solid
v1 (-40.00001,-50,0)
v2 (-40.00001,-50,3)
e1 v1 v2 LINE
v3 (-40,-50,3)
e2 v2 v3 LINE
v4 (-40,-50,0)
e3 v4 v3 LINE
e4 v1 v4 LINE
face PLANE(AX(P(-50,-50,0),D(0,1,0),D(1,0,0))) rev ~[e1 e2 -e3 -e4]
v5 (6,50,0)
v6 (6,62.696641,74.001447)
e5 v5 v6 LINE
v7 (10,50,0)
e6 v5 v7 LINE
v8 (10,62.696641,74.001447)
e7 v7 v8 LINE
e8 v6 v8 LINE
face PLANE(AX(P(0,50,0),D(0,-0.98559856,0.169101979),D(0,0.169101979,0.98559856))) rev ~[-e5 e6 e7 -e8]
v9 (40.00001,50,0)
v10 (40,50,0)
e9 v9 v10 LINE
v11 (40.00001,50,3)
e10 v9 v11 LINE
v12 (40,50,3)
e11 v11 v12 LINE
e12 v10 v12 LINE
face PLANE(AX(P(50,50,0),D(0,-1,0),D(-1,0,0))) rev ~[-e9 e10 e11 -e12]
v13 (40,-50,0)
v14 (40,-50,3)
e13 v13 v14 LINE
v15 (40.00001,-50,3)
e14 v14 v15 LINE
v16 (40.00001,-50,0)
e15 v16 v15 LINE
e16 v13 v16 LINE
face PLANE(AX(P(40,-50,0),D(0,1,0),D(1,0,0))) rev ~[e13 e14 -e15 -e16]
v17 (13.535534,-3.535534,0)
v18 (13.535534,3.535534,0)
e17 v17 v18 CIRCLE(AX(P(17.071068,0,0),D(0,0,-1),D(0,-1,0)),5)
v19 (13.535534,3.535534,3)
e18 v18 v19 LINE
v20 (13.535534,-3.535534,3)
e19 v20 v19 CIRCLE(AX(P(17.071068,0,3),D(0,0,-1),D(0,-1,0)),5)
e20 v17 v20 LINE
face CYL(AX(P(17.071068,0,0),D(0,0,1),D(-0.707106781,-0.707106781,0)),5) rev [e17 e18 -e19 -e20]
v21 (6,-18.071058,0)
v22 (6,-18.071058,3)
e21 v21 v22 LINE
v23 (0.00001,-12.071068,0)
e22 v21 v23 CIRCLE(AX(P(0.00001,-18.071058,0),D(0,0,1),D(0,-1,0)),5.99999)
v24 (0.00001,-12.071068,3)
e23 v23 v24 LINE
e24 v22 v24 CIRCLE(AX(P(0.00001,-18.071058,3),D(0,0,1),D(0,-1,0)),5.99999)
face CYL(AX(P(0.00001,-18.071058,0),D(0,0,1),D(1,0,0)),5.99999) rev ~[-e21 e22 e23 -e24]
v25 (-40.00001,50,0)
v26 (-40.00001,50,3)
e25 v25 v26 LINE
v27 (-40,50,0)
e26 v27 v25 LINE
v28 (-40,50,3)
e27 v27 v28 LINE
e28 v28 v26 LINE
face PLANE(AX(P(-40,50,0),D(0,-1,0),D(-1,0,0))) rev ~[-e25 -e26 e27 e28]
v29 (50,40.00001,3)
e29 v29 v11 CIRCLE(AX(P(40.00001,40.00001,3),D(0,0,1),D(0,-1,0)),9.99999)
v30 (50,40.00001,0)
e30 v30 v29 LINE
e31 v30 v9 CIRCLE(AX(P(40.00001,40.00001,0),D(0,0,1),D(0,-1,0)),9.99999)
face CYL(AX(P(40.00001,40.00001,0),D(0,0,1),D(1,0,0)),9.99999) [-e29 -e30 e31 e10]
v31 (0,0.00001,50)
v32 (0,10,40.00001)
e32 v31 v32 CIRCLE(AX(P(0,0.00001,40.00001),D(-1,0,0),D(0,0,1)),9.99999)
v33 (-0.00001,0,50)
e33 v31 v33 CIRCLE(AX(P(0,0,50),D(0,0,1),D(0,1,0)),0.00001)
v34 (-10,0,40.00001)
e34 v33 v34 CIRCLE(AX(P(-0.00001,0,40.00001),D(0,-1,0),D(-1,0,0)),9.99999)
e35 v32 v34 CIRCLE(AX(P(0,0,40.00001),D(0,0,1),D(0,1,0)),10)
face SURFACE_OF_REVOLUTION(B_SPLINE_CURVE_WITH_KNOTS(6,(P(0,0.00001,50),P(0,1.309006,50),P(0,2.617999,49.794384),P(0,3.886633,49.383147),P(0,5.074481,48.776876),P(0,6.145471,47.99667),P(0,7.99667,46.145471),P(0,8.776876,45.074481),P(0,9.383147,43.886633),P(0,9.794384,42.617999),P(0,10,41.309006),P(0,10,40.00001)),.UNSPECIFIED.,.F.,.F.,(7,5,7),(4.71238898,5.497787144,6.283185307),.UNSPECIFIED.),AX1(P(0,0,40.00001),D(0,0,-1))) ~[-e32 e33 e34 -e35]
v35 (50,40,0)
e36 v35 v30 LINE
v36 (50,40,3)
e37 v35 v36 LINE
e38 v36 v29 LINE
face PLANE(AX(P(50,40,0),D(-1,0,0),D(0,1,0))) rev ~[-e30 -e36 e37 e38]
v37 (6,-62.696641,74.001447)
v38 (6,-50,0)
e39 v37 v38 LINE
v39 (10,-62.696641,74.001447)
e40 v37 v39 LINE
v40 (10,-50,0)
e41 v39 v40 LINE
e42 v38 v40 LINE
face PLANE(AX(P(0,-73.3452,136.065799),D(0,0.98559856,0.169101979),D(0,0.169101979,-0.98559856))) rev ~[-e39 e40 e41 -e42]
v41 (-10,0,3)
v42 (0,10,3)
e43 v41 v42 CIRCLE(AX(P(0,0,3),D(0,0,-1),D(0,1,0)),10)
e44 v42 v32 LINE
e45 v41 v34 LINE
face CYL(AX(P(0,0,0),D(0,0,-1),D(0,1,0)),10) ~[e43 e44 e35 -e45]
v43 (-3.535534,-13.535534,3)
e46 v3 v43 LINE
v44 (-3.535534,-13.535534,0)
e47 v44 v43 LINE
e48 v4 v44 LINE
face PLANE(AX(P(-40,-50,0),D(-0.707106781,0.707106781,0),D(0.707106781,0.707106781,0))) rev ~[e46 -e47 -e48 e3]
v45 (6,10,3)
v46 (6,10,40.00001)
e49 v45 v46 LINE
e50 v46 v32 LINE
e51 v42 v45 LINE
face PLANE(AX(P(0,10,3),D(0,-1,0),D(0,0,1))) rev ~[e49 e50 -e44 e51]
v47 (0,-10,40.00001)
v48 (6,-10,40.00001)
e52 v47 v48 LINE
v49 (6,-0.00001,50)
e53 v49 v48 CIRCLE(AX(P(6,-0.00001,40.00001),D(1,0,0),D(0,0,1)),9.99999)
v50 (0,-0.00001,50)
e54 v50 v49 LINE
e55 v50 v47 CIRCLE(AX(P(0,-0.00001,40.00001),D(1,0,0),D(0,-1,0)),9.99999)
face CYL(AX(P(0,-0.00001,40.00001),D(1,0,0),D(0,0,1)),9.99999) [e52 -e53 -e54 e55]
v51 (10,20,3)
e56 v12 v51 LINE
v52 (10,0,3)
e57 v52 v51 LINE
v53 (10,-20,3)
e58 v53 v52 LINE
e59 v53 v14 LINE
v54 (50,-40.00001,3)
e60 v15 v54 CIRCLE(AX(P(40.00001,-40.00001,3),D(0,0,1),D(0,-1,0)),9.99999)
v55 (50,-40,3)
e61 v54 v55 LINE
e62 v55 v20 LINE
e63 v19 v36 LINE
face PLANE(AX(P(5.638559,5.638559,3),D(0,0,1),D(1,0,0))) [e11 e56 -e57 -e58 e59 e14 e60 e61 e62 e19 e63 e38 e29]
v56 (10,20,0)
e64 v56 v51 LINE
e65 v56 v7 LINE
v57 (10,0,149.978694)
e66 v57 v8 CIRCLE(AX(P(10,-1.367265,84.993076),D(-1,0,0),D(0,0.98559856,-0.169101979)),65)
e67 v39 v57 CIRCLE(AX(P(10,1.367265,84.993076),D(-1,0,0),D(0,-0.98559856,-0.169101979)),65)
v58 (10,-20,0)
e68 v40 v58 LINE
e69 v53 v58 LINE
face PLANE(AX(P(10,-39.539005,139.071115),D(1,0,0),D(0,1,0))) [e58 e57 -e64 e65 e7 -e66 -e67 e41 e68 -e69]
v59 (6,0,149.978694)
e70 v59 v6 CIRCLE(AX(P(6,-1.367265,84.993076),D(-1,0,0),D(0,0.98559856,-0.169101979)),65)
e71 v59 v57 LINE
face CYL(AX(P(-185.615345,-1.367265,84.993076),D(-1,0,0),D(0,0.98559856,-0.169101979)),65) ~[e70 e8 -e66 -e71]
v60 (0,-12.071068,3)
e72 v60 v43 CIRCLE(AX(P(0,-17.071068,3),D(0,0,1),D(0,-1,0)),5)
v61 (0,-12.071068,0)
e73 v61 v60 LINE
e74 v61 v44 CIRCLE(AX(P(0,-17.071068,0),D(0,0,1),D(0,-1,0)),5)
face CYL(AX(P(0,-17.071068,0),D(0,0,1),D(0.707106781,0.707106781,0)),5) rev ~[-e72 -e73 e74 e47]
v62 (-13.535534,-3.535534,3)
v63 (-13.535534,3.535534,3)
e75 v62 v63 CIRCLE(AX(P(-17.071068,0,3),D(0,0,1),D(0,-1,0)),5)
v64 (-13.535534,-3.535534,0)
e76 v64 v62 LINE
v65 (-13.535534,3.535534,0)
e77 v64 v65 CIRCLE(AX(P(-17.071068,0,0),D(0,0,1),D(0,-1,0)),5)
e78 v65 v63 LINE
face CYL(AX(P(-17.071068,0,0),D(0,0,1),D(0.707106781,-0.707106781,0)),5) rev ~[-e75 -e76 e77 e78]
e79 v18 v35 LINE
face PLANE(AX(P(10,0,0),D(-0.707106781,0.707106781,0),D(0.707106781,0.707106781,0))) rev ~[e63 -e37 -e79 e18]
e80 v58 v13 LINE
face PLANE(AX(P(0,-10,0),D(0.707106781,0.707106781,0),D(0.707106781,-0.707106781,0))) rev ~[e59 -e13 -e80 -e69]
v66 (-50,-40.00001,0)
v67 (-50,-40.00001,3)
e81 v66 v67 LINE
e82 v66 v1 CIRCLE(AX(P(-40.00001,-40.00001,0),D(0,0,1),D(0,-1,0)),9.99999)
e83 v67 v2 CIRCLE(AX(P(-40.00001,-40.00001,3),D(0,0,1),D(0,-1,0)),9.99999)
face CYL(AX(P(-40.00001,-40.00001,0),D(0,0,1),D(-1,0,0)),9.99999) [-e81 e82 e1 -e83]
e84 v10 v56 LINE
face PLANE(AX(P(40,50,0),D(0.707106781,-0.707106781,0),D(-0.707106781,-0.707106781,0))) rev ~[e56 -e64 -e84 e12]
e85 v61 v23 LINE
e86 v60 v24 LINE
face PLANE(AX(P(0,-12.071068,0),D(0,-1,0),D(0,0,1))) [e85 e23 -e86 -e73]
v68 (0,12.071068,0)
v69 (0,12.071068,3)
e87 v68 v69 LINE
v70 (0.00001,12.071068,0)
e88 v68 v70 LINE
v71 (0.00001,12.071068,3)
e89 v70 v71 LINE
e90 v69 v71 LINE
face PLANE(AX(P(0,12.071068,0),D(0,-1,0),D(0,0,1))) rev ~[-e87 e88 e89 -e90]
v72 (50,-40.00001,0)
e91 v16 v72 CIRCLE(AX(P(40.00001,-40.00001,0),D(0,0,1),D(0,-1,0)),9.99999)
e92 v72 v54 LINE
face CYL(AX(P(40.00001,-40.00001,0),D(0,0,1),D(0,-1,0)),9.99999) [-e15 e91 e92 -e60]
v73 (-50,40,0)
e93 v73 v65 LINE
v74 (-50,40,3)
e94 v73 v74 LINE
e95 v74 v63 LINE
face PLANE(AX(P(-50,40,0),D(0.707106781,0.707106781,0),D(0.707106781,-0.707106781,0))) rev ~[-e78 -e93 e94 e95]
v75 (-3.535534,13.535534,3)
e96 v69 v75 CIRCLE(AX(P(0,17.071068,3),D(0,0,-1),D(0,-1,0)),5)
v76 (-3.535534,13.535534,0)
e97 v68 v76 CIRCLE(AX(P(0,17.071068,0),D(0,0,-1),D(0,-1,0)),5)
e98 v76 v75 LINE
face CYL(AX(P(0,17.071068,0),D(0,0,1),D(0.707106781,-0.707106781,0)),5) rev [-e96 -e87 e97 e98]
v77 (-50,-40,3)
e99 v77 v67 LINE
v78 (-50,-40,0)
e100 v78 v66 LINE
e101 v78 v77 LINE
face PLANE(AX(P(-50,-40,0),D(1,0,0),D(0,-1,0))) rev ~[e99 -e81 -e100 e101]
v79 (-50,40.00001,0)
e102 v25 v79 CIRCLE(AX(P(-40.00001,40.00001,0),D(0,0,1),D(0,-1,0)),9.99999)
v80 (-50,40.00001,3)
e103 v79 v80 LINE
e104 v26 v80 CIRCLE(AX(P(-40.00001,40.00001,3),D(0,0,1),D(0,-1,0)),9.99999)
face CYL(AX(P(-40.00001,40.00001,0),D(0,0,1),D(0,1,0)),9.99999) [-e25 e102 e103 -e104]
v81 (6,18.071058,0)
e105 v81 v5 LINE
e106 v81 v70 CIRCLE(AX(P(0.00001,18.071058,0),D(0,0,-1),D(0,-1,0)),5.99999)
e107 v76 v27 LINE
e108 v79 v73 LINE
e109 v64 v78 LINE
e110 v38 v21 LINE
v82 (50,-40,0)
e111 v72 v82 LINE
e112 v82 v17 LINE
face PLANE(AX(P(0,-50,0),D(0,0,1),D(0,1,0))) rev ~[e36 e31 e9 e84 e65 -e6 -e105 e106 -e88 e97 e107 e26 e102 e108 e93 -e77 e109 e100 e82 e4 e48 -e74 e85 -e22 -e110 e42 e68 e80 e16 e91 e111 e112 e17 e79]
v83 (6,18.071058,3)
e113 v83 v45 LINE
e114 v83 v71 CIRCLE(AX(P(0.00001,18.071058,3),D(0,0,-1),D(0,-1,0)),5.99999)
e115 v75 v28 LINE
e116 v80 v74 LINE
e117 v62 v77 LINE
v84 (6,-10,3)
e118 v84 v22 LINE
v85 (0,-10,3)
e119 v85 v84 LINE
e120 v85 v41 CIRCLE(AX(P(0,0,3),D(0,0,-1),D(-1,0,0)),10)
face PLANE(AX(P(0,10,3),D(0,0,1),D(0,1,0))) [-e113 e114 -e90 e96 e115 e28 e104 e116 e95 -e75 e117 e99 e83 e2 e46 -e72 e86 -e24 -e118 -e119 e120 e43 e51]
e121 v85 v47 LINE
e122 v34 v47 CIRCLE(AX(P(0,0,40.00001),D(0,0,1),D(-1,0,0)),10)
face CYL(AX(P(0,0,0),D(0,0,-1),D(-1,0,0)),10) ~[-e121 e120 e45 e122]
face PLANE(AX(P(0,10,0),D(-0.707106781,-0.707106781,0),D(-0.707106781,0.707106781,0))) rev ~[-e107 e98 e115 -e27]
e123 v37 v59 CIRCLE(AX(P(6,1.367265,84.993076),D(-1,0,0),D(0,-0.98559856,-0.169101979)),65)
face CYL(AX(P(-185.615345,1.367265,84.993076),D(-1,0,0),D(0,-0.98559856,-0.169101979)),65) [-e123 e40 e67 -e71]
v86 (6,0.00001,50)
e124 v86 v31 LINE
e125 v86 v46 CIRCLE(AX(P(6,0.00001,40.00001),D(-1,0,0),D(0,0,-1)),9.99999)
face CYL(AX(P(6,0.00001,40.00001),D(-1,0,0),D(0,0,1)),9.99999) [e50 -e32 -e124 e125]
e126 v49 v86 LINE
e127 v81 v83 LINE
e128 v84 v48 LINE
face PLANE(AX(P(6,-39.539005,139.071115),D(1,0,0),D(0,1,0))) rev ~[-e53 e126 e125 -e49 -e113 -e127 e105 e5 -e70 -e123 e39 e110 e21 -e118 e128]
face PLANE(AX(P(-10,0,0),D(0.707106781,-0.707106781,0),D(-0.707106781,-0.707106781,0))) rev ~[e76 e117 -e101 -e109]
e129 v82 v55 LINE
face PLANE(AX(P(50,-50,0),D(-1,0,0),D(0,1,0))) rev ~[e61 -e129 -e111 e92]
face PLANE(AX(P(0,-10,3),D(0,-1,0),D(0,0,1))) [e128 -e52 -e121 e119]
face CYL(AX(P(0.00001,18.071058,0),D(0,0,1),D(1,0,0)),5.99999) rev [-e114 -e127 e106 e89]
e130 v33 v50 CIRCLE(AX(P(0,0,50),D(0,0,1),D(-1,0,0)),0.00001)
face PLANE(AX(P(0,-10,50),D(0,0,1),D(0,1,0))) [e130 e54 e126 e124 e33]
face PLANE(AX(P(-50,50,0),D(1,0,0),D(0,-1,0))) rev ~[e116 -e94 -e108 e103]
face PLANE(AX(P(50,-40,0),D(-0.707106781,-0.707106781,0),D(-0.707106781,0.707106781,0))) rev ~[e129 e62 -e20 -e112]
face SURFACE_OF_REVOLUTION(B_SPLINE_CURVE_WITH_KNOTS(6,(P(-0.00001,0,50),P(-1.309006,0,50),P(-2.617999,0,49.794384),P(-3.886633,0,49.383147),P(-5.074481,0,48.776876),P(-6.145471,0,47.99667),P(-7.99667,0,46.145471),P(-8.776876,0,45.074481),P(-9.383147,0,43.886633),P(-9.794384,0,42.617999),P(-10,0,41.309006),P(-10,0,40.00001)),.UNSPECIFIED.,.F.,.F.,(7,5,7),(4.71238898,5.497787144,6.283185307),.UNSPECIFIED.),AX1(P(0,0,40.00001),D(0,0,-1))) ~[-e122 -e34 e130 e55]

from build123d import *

# Parameters (mm, degrees)
F1_DEPTH    = 3
F2_R        = 9.99999
F3_R        = 5
F4_DEPTH    = 50
F6_DEPTH    = 10
F7_DEPTH    = 6
F8_T1_DEPTH = 387.2306894548
F9_R        = 9.99999
F10_R       = 5.99999


# Not quite as in the source:
# - a fillet or chamfer that OpenCascade refuses, or shapes differently, is made with other operations: its cross-section is extruded or revolved along the edge and cut away or added
# - a fillet or chamfer is up to 0.001 mm smaller than in the source, because OpenCascade refuses the exact size


with BuildPart() as f1:
    # F0 (on Top) → F1 (new body)
    with BuildSketch(Plane.XY):
        with BuildLine():
            Line((0, 10), (10, 0))
            ThreePointArc((10, 0), (7.0710678119, 7.0710678119), (0, 10))
        make_face()
        with BuildLine():
            Line((50, -40), (10, 0))
            ThreePointArc((10, 0), (7.0710678119, -7.0710678119), (0, -10))
            Line((0, -10), (40, -50))
            Line((40, -50), (50, -50))
            Line((50, -50), (50, -40))
        make_face()
        Polygon((0, -10), (10, 0), (0, 10), (-10, 0), align=None)
        with BuildLine():
            ThreePointArc((0, 10), (7.0710678119, 7.0710678119), (10, 0))
            Line((10, 0), (50, 40))
            Line((50, 40), (50, 50))
            Line((50, 50), (40, 50))
            Line((40, 50), (0, 10))
        make_face()
        with BuildLine():
            ThreePointArc((0, -10), (7.0710678119, -7.0710678119), (10, 0))
            Line((10, 0), (0, -10))
        make_face()
        with BuildLine():
            Line((-10, 0), (0, 10))
            ThreePointArc((0, 10), (-7.0710678119, 7.0710678119), (-10, 0))
        make_face()
        with BuildLine():
            ThreePointArc((-10, 0), (-7.0710678119, 7.0710678119), (0, 10))
            Line((0, 10), (-40, 50))
            Line((-40, 50), (-50, 50))
            Line((-50, 50), (-50, 40))
            Line((-50, 40), (-10, 0))
        make_face()
        with BuildLine():
            Line((-40, -50), (0, -10))
            ThreePointArc((0, -10), (-7.0710678119, -7.0710678119), (-10, 0))
            Line((-10, 0), (-50, -40))
            Line((-50, -40), (-50, -50))
            Line((-50, -50), (-40, -50))
        make_face()
        with BuildLine():
            ThreePointArc((-10, 0), (-7.0710678119, -7.0710678119), (0, -10))
            Line((0, -10), (-10, 0))
        make_face()
    extrude(amount=F1_DEPTH)

    # F2 (radius 10 in the source; OpenCascade refuses exactly that, so slightly less here)
    f2_edges = [f1.edges().sort_by_distance(p)[0] for p in [
        (-50, 50, 1.5),
        (-50, -50, 1.5),
        (50, -50, 1.5),
        (50, 50, 1.5),
    ]]
    fillet(f2_edges, radius=F2_R)

    # F3
    f3_edges = [f1.edges().sort_by_distance(p)[0] for p in [
        (10, 0, 1.5),
        (0, 10, 1.5),
        (-10, 0, 1.5),
        (0, -10, 1.5),
    ]]
    fillet(f3_edges, radius=F3_R)

    # F0 (on Top) → F4 (join)
    with BuildSketch(Plane.XY):
        with BuildLine():
            Line((0, 10), (10, 0))
            ThreePointArc((10, 0), (7.0710678119, 7.0710678119), (0, 10))
        make_face()
        Polygon((0, -10), (10, 0), (0, 10), (-10, 0), align=None)
        with BuildLine():
            ThreePointArc((0, -10), (7.0710678119, -7.0710678119), (10, 0))
            Line((10, 0), (0, -10))
        make_face()
        with BuildLine():
            Line((-10, 0), (0, 10))
            ThreePointArc((0, 10), (-7.0710678119, 7.0710678119), (-10, 0))
        make_face()
        with BuildLine():
            ThreePointArc((-10, 0), (-7.0710678119, -7.0710678119), (0, -10))
            Line((0, -10), (-10, 0))
        make_face()
    extrude(amount=F4_DEPTH)

    # F5 (on Right) → F6 (join)
    with BuildSketch(Plane.YZ):
        with BuildLine():
            Line((-70.7106781187, 120.7106781187), (0, 150))
            ThreePointArc((0, 150), (-37.3285426078, 146.4855717522), (-73.3452003698, 136.0657990677))
            Line((-73.3452003698, 136.0657990677), (-70.7106781187, 120.7106781187))
        make_face()
        Polygon((-64.6446609407, 85.3553390593), (0, 150), (-70.7106781187, 120.7106781187), align=None)
        Polygon((-50, 0), (0, 0), (0, 150), (-64.6446609407, 85.3553390593), align=None)
        Polygon((0, 150), (0, 0), (50, 0), (64.6446609407, 85.3553390593), align=None)
        Polygon((70.7106781187, 120.7106781187), (0, 150), (64.6446609407, 85.3553390593), align=None)
        with BuildLine():
            ThreePointArc((73.3452003698, 136.0657990677), (37.3285426078, 146.4855717522), (0, 150))
            Line((0, 150), (70.7106781187, 120.7106781187))
            Line((70.7106781187, 120.7106781187), (73.3452003698, 136.0657990677))
        make_face()
    extrude(amount=F6_DEPTH)

    # F7 (cut): a face of the model
    f7_faces = [f1.faces().sort_by_distance(p)[0] for p in [
        (0, 0, 80.6875743248),
    ]]
    extrude(f7_faces, amount=-F7_DEPTH, mode=Mode.SUBTRACT)

    # F8: fillet of radius 65 on 2 edges, made by hand

    # F8_s2 → F8_t1 (cut)
    with BuildSketch(Plane.YZ.offset(-185.6153447274)):
        with BuildLine():
            ThreePointArc((-62.6966411117, 74.0014474486), (-48.1162932181, 127.140168964), (2.0255781715, 149.9897423196))
            ThreePointArc((2.0255781715, 149.9897423196), (-36.3330590034, 146.6720845048), (-73.3452003698, 136.0657990677))
            Line((-73.3452003698, 136.0657990677), (-62.6966411117, 74.0014474486))
        make_face()
        with BuildLine():
            ThreePointArc((62.6966411117, 74.0014474486), (48.1162932181, 127.140168964), (-2.0255781715, 149.9897423196))
            ThreePointArc((-2.0255781715, 149.9897423196), (36.3330590034, 146.6720845048), (73.3452003698, 136.0657990677))
            Line((73.3452003698, 136.0657990677), (62.6966411117, 74.0014474486))
        make_face()
    extrude(amount=F8_T1_DEPTH, mode=Mode.SUBTRACT)

    # F9 (radius 10 in the source; OpenCascade refuses exactly that, so slightly less here)
    f9_edges = [f1.edges().sort_by_distance(p)[0] for p in [
        (-10, 0, 50),
        (3, 10, 50),
        (3, -10, 50),
    ]]
    fillet(f9_edges, radius=F9_R)

    # F10 (radius 6 in the source; OpenCascade refuses exactly that, so slightly less here)
    f10_edges = [f1.edges().sort_by_distance(p)[0] for p in [
        (6, 12.071068, 1.5),
        (6, -12.071068, 1.5),
    ]]
    fillet(f10_edges, radius=F10_R)


solid = f1.part
